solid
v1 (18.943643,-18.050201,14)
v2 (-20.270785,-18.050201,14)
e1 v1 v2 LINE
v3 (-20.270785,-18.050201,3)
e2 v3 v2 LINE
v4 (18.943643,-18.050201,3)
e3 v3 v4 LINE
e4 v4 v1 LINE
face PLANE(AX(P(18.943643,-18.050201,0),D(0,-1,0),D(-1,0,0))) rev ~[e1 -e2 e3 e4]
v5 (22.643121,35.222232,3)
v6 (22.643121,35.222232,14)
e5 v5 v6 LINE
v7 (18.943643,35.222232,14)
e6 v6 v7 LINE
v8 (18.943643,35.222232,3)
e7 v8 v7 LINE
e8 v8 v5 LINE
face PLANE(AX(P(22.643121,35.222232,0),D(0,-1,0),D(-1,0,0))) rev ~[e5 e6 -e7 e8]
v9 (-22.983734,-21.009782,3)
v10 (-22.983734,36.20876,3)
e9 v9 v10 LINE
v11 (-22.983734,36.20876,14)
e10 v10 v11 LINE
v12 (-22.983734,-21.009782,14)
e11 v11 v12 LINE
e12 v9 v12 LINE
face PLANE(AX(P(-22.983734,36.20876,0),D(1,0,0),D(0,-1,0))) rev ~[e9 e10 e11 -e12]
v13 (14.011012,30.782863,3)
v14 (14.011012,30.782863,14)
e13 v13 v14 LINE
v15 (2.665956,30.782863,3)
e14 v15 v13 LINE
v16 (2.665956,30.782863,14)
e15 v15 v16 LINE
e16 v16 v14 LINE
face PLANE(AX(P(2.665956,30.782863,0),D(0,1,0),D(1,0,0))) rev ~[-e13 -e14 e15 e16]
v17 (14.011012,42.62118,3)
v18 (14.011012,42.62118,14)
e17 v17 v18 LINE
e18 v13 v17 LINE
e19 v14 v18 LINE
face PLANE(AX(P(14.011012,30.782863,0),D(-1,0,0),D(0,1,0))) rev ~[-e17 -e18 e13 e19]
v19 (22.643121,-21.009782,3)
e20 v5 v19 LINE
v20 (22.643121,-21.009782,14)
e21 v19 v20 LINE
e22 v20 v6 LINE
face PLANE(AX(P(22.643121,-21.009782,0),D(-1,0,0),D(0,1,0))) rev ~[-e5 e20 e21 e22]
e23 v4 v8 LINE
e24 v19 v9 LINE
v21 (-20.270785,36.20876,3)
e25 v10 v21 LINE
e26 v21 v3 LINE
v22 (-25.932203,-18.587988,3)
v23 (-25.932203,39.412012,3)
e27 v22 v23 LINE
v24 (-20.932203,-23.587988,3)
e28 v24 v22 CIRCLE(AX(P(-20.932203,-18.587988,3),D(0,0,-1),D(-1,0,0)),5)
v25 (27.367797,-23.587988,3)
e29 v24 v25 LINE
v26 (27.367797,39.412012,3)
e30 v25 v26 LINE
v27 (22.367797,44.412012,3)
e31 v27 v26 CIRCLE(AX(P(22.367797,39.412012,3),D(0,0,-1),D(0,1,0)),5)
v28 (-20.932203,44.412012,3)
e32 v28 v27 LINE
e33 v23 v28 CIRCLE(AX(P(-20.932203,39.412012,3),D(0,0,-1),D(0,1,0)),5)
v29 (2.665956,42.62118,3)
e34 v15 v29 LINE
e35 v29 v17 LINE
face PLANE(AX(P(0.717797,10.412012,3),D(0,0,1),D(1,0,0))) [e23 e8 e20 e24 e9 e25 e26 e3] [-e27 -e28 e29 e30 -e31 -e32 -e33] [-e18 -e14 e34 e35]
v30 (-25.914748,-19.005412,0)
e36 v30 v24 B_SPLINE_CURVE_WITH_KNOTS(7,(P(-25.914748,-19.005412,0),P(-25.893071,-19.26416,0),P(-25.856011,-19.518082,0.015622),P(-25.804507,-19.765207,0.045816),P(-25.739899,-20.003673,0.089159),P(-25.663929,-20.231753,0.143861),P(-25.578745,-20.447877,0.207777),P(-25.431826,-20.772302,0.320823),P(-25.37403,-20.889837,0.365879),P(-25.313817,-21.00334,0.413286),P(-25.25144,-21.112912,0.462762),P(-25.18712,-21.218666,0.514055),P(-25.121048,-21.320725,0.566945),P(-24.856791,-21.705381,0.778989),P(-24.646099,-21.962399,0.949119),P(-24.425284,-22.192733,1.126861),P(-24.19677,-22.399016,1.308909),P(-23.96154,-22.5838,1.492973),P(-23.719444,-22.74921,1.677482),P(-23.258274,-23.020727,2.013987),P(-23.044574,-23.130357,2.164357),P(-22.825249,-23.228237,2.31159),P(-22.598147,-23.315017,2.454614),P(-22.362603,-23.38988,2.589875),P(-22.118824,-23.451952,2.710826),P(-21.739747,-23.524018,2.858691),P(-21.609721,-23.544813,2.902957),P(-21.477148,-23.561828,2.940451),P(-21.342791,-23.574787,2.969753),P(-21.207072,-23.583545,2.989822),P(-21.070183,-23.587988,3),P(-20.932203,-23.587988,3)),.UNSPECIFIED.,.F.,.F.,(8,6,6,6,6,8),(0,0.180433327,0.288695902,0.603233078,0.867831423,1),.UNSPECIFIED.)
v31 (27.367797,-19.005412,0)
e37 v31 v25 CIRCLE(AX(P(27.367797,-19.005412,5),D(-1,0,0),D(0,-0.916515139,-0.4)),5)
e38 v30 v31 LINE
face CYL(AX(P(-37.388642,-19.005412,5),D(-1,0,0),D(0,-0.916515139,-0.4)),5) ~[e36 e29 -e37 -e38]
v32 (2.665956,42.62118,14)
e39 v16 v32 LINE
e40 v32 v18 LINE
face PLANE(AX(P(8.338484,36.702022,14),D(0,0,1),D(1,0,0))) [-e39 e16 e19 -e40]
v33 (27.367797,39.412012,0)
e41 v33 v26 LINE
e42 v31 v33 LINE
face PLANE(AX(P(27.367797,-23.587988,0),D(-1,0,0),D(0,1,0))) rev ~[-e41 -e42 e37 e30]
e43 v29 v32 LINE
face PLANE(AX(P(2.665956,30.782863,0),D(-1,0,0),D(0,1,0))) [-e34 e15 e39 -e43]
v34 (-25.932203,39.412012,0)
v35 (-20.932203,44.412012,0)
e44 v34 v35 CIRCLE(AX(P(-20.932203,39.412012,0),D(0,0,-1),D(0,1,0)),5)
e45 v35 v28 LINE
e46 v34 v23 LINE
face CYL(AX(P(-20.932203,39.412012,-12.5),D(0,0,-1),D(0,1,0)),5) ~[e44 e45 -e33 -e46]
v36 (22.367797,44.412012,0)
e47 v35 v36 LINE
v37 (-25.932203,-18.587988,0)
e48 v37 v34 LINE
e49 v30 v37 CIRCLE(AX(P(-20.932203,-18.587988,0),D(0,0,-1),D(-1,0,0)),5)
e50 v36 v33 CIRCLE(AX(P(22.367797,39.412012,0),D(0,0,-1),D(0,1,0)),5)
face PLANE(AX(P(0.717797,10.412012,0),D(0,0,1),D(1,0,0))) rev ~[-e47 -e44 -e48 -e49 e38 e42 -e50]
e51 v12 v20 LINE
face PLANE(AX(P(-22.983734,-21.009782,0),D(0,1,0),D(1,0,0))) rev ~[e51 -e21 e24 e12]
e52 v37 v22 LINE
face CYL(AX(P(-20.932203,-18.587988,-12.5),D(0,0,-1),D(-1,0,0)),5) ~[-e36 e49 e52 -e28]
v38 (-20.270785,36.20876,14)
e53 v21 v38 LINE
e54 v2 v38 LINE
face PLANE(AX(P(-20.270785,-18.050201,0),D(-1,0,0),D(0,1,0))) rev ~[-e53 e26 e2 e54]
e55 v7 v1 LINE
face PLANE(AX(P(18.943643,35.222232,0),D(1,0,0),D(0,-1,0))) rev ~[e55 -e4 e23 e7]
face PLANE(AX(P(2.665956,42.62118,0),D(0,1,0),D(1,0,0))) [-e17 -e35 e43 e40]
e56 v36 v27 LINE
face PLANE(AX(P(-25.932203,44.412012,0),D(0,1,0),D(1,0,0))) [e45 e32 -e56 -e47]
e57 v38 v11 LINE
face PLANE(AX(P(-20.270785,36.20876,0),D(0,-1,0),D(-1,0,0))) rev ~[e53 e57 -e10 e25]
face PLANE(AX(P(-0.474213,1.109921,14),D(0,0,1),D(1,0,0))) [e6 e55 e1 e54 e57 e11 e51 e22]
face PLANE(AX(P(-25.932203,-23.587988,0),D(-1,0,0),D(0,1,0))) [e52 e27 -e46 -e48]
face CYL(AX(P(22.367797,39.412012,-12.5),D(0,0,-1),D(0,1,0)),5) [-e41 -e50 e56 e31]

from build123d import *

# Parameters (mm, degrees)
F1_DEPTH    = 14
F0_W        = 11.3450561184
F0_H        = 11.8383169174
F0_W_2      = 53.3
F0_H_2      = 68
F2_DEPTH    = 3
F3_T1_DEPTH = 28
F3_T3_DEPTH = 76.2128784748


# Not quite as in the source:
# - a fillet or chamfer that OpenCascade refuses, or shapes differently, is made with other operations: its cross-section is extruded or revolved along the edge and cut away or added


with BuildPart() as f1:
    # F0 (on Top) → F1 (new body)
    with BuildSketch(Plane.XY):
        Polygon((-20.2707853168, 36.2087599933), (-22.9837335646, 36.2087599933), (-22.9837335646, -18.0502012372), (-22.9837335646, -21.0097823292), (-20.2707853168, -21.0097823292), (18.9436431974, -21.0097823292), (22.6431209594, -21.0097823292), (22.6431209594, -18.0502012372), (22.6431209594, 35.2222323418), (18.9436431974, 35.2222323418), (18.9436431974, -18.0502012372), (-20.2707853168, -18.0502012372), align=None)
    extrude(amount=F1_DEPTH)



with BuildPart() as f1b:
    # F0 (on Top) → F1, piece 2 (new body)
    with BuildSketch(Plane.XY):
        with Locations((8.338484331, 36.7020219564)):
            Rectangle(F0_W, F0_H)
    extrude(amount=F1_DEPTH)


with BuildPart() as f1_1:
    add(f1.part)

    add(f1b.part)  # F2 merges F1b
    # F0 (on Top) → F2 (join)
    with BuildSketch(Plane.XY):
        with Locations((0.7177972624, 10.4120122269)):
            Rectangle(F0_W_2, F0_H_2)
        Polygon((-22.9837335646, -18.0502012372), (-22.9837335646, 36.2087599933), (-20.2707853168, 36.2087599933), (-20.2707853168, -18.0502012372), (18.9436431974, -18.0502012372), (18.9436431974, 35.2222323418), (22.6431209594, 35.2222323418), (22.6431209594, -18.0502012372), (22.6431209594, -21.0097823292), (18.9436431974, -21.0097823292), (-20.2707853168, -21.0097823292), (-22.9837335646, -21.0097823292), align=None, mode=Mode.SUBTRACT)
        with Locations((8.338484331, 36.7020219564)):
            Rectangle(F0_W, F0_H, mode=Mode.SUBTRACT)
    extrude(amount=F2_DEPTH)

    # F3: fillet of radius 5 on 4 edges, made by hand

    # F3_s2 → F3_t1 (cut)
    with BuildSketch(Plane.XY.offset(-12.5)):
        with BuildLine():
            ThreePointArc((-20.9322027376, 44.4120122269), (-24.4677366436, 42.9475461328), (-25.9322027376, 39.4120122269))
            Line((-25.9322027376, 39.4120122269), (-25.9322027376, 44.4120122269))
            Line((-25.9322027376, 44.4120122269), (-20.9322027376, 44.4120122269))
        make_face()
        with BuildLine():
            ThreePointArc((-25.9322027376, -18.5879877731), (-24.4677366436, -22.1235216791), (-20.9322027376, -23.5879877731))
            Line((-20.9322027376, -23.5879877731), (-25.9322027376, -23.5879877731))
            Line((-25.9322027376, -23.5879877731), (-25.9322027376, -18.5879877731))
        make_face()
        with BuildLine():
            ThreePointArc((22.3677972624, 44.4120122269), (25.9033311683, 42.9475461328), (27.3677972624, 39.4120122269))
            Line((27.3677972624, 39.4120122269), (27.3677972624, 44.4120122269))
            Line((27.3677972624, 44.4120122269), (22.3677972624, 44.4120122269))
        make_face()
    extrude(amount=F3_T1_DEPTH, mode=Mode.SUBTRACT)

    # F3_s4 → F3_t3 (cut)
    with BuildSketch(Plane.YZ.offset(-37.388641975)):
        with BuildLine():
            ThreePointArc((-23.5879877731, 3), (-21.7440248657, 0.8166998673), (-19.0054120782, 0))
            Line((-19.0054120782, 0), (-23.5879877731, 0))
            Line((-23.5879877731, 0), (-23.5879877731, 3))
        make_face()
    extrude(amount=F3_T3_DEPTH, mode=Mode.SUBTRACT)


solid = f1_1.part
